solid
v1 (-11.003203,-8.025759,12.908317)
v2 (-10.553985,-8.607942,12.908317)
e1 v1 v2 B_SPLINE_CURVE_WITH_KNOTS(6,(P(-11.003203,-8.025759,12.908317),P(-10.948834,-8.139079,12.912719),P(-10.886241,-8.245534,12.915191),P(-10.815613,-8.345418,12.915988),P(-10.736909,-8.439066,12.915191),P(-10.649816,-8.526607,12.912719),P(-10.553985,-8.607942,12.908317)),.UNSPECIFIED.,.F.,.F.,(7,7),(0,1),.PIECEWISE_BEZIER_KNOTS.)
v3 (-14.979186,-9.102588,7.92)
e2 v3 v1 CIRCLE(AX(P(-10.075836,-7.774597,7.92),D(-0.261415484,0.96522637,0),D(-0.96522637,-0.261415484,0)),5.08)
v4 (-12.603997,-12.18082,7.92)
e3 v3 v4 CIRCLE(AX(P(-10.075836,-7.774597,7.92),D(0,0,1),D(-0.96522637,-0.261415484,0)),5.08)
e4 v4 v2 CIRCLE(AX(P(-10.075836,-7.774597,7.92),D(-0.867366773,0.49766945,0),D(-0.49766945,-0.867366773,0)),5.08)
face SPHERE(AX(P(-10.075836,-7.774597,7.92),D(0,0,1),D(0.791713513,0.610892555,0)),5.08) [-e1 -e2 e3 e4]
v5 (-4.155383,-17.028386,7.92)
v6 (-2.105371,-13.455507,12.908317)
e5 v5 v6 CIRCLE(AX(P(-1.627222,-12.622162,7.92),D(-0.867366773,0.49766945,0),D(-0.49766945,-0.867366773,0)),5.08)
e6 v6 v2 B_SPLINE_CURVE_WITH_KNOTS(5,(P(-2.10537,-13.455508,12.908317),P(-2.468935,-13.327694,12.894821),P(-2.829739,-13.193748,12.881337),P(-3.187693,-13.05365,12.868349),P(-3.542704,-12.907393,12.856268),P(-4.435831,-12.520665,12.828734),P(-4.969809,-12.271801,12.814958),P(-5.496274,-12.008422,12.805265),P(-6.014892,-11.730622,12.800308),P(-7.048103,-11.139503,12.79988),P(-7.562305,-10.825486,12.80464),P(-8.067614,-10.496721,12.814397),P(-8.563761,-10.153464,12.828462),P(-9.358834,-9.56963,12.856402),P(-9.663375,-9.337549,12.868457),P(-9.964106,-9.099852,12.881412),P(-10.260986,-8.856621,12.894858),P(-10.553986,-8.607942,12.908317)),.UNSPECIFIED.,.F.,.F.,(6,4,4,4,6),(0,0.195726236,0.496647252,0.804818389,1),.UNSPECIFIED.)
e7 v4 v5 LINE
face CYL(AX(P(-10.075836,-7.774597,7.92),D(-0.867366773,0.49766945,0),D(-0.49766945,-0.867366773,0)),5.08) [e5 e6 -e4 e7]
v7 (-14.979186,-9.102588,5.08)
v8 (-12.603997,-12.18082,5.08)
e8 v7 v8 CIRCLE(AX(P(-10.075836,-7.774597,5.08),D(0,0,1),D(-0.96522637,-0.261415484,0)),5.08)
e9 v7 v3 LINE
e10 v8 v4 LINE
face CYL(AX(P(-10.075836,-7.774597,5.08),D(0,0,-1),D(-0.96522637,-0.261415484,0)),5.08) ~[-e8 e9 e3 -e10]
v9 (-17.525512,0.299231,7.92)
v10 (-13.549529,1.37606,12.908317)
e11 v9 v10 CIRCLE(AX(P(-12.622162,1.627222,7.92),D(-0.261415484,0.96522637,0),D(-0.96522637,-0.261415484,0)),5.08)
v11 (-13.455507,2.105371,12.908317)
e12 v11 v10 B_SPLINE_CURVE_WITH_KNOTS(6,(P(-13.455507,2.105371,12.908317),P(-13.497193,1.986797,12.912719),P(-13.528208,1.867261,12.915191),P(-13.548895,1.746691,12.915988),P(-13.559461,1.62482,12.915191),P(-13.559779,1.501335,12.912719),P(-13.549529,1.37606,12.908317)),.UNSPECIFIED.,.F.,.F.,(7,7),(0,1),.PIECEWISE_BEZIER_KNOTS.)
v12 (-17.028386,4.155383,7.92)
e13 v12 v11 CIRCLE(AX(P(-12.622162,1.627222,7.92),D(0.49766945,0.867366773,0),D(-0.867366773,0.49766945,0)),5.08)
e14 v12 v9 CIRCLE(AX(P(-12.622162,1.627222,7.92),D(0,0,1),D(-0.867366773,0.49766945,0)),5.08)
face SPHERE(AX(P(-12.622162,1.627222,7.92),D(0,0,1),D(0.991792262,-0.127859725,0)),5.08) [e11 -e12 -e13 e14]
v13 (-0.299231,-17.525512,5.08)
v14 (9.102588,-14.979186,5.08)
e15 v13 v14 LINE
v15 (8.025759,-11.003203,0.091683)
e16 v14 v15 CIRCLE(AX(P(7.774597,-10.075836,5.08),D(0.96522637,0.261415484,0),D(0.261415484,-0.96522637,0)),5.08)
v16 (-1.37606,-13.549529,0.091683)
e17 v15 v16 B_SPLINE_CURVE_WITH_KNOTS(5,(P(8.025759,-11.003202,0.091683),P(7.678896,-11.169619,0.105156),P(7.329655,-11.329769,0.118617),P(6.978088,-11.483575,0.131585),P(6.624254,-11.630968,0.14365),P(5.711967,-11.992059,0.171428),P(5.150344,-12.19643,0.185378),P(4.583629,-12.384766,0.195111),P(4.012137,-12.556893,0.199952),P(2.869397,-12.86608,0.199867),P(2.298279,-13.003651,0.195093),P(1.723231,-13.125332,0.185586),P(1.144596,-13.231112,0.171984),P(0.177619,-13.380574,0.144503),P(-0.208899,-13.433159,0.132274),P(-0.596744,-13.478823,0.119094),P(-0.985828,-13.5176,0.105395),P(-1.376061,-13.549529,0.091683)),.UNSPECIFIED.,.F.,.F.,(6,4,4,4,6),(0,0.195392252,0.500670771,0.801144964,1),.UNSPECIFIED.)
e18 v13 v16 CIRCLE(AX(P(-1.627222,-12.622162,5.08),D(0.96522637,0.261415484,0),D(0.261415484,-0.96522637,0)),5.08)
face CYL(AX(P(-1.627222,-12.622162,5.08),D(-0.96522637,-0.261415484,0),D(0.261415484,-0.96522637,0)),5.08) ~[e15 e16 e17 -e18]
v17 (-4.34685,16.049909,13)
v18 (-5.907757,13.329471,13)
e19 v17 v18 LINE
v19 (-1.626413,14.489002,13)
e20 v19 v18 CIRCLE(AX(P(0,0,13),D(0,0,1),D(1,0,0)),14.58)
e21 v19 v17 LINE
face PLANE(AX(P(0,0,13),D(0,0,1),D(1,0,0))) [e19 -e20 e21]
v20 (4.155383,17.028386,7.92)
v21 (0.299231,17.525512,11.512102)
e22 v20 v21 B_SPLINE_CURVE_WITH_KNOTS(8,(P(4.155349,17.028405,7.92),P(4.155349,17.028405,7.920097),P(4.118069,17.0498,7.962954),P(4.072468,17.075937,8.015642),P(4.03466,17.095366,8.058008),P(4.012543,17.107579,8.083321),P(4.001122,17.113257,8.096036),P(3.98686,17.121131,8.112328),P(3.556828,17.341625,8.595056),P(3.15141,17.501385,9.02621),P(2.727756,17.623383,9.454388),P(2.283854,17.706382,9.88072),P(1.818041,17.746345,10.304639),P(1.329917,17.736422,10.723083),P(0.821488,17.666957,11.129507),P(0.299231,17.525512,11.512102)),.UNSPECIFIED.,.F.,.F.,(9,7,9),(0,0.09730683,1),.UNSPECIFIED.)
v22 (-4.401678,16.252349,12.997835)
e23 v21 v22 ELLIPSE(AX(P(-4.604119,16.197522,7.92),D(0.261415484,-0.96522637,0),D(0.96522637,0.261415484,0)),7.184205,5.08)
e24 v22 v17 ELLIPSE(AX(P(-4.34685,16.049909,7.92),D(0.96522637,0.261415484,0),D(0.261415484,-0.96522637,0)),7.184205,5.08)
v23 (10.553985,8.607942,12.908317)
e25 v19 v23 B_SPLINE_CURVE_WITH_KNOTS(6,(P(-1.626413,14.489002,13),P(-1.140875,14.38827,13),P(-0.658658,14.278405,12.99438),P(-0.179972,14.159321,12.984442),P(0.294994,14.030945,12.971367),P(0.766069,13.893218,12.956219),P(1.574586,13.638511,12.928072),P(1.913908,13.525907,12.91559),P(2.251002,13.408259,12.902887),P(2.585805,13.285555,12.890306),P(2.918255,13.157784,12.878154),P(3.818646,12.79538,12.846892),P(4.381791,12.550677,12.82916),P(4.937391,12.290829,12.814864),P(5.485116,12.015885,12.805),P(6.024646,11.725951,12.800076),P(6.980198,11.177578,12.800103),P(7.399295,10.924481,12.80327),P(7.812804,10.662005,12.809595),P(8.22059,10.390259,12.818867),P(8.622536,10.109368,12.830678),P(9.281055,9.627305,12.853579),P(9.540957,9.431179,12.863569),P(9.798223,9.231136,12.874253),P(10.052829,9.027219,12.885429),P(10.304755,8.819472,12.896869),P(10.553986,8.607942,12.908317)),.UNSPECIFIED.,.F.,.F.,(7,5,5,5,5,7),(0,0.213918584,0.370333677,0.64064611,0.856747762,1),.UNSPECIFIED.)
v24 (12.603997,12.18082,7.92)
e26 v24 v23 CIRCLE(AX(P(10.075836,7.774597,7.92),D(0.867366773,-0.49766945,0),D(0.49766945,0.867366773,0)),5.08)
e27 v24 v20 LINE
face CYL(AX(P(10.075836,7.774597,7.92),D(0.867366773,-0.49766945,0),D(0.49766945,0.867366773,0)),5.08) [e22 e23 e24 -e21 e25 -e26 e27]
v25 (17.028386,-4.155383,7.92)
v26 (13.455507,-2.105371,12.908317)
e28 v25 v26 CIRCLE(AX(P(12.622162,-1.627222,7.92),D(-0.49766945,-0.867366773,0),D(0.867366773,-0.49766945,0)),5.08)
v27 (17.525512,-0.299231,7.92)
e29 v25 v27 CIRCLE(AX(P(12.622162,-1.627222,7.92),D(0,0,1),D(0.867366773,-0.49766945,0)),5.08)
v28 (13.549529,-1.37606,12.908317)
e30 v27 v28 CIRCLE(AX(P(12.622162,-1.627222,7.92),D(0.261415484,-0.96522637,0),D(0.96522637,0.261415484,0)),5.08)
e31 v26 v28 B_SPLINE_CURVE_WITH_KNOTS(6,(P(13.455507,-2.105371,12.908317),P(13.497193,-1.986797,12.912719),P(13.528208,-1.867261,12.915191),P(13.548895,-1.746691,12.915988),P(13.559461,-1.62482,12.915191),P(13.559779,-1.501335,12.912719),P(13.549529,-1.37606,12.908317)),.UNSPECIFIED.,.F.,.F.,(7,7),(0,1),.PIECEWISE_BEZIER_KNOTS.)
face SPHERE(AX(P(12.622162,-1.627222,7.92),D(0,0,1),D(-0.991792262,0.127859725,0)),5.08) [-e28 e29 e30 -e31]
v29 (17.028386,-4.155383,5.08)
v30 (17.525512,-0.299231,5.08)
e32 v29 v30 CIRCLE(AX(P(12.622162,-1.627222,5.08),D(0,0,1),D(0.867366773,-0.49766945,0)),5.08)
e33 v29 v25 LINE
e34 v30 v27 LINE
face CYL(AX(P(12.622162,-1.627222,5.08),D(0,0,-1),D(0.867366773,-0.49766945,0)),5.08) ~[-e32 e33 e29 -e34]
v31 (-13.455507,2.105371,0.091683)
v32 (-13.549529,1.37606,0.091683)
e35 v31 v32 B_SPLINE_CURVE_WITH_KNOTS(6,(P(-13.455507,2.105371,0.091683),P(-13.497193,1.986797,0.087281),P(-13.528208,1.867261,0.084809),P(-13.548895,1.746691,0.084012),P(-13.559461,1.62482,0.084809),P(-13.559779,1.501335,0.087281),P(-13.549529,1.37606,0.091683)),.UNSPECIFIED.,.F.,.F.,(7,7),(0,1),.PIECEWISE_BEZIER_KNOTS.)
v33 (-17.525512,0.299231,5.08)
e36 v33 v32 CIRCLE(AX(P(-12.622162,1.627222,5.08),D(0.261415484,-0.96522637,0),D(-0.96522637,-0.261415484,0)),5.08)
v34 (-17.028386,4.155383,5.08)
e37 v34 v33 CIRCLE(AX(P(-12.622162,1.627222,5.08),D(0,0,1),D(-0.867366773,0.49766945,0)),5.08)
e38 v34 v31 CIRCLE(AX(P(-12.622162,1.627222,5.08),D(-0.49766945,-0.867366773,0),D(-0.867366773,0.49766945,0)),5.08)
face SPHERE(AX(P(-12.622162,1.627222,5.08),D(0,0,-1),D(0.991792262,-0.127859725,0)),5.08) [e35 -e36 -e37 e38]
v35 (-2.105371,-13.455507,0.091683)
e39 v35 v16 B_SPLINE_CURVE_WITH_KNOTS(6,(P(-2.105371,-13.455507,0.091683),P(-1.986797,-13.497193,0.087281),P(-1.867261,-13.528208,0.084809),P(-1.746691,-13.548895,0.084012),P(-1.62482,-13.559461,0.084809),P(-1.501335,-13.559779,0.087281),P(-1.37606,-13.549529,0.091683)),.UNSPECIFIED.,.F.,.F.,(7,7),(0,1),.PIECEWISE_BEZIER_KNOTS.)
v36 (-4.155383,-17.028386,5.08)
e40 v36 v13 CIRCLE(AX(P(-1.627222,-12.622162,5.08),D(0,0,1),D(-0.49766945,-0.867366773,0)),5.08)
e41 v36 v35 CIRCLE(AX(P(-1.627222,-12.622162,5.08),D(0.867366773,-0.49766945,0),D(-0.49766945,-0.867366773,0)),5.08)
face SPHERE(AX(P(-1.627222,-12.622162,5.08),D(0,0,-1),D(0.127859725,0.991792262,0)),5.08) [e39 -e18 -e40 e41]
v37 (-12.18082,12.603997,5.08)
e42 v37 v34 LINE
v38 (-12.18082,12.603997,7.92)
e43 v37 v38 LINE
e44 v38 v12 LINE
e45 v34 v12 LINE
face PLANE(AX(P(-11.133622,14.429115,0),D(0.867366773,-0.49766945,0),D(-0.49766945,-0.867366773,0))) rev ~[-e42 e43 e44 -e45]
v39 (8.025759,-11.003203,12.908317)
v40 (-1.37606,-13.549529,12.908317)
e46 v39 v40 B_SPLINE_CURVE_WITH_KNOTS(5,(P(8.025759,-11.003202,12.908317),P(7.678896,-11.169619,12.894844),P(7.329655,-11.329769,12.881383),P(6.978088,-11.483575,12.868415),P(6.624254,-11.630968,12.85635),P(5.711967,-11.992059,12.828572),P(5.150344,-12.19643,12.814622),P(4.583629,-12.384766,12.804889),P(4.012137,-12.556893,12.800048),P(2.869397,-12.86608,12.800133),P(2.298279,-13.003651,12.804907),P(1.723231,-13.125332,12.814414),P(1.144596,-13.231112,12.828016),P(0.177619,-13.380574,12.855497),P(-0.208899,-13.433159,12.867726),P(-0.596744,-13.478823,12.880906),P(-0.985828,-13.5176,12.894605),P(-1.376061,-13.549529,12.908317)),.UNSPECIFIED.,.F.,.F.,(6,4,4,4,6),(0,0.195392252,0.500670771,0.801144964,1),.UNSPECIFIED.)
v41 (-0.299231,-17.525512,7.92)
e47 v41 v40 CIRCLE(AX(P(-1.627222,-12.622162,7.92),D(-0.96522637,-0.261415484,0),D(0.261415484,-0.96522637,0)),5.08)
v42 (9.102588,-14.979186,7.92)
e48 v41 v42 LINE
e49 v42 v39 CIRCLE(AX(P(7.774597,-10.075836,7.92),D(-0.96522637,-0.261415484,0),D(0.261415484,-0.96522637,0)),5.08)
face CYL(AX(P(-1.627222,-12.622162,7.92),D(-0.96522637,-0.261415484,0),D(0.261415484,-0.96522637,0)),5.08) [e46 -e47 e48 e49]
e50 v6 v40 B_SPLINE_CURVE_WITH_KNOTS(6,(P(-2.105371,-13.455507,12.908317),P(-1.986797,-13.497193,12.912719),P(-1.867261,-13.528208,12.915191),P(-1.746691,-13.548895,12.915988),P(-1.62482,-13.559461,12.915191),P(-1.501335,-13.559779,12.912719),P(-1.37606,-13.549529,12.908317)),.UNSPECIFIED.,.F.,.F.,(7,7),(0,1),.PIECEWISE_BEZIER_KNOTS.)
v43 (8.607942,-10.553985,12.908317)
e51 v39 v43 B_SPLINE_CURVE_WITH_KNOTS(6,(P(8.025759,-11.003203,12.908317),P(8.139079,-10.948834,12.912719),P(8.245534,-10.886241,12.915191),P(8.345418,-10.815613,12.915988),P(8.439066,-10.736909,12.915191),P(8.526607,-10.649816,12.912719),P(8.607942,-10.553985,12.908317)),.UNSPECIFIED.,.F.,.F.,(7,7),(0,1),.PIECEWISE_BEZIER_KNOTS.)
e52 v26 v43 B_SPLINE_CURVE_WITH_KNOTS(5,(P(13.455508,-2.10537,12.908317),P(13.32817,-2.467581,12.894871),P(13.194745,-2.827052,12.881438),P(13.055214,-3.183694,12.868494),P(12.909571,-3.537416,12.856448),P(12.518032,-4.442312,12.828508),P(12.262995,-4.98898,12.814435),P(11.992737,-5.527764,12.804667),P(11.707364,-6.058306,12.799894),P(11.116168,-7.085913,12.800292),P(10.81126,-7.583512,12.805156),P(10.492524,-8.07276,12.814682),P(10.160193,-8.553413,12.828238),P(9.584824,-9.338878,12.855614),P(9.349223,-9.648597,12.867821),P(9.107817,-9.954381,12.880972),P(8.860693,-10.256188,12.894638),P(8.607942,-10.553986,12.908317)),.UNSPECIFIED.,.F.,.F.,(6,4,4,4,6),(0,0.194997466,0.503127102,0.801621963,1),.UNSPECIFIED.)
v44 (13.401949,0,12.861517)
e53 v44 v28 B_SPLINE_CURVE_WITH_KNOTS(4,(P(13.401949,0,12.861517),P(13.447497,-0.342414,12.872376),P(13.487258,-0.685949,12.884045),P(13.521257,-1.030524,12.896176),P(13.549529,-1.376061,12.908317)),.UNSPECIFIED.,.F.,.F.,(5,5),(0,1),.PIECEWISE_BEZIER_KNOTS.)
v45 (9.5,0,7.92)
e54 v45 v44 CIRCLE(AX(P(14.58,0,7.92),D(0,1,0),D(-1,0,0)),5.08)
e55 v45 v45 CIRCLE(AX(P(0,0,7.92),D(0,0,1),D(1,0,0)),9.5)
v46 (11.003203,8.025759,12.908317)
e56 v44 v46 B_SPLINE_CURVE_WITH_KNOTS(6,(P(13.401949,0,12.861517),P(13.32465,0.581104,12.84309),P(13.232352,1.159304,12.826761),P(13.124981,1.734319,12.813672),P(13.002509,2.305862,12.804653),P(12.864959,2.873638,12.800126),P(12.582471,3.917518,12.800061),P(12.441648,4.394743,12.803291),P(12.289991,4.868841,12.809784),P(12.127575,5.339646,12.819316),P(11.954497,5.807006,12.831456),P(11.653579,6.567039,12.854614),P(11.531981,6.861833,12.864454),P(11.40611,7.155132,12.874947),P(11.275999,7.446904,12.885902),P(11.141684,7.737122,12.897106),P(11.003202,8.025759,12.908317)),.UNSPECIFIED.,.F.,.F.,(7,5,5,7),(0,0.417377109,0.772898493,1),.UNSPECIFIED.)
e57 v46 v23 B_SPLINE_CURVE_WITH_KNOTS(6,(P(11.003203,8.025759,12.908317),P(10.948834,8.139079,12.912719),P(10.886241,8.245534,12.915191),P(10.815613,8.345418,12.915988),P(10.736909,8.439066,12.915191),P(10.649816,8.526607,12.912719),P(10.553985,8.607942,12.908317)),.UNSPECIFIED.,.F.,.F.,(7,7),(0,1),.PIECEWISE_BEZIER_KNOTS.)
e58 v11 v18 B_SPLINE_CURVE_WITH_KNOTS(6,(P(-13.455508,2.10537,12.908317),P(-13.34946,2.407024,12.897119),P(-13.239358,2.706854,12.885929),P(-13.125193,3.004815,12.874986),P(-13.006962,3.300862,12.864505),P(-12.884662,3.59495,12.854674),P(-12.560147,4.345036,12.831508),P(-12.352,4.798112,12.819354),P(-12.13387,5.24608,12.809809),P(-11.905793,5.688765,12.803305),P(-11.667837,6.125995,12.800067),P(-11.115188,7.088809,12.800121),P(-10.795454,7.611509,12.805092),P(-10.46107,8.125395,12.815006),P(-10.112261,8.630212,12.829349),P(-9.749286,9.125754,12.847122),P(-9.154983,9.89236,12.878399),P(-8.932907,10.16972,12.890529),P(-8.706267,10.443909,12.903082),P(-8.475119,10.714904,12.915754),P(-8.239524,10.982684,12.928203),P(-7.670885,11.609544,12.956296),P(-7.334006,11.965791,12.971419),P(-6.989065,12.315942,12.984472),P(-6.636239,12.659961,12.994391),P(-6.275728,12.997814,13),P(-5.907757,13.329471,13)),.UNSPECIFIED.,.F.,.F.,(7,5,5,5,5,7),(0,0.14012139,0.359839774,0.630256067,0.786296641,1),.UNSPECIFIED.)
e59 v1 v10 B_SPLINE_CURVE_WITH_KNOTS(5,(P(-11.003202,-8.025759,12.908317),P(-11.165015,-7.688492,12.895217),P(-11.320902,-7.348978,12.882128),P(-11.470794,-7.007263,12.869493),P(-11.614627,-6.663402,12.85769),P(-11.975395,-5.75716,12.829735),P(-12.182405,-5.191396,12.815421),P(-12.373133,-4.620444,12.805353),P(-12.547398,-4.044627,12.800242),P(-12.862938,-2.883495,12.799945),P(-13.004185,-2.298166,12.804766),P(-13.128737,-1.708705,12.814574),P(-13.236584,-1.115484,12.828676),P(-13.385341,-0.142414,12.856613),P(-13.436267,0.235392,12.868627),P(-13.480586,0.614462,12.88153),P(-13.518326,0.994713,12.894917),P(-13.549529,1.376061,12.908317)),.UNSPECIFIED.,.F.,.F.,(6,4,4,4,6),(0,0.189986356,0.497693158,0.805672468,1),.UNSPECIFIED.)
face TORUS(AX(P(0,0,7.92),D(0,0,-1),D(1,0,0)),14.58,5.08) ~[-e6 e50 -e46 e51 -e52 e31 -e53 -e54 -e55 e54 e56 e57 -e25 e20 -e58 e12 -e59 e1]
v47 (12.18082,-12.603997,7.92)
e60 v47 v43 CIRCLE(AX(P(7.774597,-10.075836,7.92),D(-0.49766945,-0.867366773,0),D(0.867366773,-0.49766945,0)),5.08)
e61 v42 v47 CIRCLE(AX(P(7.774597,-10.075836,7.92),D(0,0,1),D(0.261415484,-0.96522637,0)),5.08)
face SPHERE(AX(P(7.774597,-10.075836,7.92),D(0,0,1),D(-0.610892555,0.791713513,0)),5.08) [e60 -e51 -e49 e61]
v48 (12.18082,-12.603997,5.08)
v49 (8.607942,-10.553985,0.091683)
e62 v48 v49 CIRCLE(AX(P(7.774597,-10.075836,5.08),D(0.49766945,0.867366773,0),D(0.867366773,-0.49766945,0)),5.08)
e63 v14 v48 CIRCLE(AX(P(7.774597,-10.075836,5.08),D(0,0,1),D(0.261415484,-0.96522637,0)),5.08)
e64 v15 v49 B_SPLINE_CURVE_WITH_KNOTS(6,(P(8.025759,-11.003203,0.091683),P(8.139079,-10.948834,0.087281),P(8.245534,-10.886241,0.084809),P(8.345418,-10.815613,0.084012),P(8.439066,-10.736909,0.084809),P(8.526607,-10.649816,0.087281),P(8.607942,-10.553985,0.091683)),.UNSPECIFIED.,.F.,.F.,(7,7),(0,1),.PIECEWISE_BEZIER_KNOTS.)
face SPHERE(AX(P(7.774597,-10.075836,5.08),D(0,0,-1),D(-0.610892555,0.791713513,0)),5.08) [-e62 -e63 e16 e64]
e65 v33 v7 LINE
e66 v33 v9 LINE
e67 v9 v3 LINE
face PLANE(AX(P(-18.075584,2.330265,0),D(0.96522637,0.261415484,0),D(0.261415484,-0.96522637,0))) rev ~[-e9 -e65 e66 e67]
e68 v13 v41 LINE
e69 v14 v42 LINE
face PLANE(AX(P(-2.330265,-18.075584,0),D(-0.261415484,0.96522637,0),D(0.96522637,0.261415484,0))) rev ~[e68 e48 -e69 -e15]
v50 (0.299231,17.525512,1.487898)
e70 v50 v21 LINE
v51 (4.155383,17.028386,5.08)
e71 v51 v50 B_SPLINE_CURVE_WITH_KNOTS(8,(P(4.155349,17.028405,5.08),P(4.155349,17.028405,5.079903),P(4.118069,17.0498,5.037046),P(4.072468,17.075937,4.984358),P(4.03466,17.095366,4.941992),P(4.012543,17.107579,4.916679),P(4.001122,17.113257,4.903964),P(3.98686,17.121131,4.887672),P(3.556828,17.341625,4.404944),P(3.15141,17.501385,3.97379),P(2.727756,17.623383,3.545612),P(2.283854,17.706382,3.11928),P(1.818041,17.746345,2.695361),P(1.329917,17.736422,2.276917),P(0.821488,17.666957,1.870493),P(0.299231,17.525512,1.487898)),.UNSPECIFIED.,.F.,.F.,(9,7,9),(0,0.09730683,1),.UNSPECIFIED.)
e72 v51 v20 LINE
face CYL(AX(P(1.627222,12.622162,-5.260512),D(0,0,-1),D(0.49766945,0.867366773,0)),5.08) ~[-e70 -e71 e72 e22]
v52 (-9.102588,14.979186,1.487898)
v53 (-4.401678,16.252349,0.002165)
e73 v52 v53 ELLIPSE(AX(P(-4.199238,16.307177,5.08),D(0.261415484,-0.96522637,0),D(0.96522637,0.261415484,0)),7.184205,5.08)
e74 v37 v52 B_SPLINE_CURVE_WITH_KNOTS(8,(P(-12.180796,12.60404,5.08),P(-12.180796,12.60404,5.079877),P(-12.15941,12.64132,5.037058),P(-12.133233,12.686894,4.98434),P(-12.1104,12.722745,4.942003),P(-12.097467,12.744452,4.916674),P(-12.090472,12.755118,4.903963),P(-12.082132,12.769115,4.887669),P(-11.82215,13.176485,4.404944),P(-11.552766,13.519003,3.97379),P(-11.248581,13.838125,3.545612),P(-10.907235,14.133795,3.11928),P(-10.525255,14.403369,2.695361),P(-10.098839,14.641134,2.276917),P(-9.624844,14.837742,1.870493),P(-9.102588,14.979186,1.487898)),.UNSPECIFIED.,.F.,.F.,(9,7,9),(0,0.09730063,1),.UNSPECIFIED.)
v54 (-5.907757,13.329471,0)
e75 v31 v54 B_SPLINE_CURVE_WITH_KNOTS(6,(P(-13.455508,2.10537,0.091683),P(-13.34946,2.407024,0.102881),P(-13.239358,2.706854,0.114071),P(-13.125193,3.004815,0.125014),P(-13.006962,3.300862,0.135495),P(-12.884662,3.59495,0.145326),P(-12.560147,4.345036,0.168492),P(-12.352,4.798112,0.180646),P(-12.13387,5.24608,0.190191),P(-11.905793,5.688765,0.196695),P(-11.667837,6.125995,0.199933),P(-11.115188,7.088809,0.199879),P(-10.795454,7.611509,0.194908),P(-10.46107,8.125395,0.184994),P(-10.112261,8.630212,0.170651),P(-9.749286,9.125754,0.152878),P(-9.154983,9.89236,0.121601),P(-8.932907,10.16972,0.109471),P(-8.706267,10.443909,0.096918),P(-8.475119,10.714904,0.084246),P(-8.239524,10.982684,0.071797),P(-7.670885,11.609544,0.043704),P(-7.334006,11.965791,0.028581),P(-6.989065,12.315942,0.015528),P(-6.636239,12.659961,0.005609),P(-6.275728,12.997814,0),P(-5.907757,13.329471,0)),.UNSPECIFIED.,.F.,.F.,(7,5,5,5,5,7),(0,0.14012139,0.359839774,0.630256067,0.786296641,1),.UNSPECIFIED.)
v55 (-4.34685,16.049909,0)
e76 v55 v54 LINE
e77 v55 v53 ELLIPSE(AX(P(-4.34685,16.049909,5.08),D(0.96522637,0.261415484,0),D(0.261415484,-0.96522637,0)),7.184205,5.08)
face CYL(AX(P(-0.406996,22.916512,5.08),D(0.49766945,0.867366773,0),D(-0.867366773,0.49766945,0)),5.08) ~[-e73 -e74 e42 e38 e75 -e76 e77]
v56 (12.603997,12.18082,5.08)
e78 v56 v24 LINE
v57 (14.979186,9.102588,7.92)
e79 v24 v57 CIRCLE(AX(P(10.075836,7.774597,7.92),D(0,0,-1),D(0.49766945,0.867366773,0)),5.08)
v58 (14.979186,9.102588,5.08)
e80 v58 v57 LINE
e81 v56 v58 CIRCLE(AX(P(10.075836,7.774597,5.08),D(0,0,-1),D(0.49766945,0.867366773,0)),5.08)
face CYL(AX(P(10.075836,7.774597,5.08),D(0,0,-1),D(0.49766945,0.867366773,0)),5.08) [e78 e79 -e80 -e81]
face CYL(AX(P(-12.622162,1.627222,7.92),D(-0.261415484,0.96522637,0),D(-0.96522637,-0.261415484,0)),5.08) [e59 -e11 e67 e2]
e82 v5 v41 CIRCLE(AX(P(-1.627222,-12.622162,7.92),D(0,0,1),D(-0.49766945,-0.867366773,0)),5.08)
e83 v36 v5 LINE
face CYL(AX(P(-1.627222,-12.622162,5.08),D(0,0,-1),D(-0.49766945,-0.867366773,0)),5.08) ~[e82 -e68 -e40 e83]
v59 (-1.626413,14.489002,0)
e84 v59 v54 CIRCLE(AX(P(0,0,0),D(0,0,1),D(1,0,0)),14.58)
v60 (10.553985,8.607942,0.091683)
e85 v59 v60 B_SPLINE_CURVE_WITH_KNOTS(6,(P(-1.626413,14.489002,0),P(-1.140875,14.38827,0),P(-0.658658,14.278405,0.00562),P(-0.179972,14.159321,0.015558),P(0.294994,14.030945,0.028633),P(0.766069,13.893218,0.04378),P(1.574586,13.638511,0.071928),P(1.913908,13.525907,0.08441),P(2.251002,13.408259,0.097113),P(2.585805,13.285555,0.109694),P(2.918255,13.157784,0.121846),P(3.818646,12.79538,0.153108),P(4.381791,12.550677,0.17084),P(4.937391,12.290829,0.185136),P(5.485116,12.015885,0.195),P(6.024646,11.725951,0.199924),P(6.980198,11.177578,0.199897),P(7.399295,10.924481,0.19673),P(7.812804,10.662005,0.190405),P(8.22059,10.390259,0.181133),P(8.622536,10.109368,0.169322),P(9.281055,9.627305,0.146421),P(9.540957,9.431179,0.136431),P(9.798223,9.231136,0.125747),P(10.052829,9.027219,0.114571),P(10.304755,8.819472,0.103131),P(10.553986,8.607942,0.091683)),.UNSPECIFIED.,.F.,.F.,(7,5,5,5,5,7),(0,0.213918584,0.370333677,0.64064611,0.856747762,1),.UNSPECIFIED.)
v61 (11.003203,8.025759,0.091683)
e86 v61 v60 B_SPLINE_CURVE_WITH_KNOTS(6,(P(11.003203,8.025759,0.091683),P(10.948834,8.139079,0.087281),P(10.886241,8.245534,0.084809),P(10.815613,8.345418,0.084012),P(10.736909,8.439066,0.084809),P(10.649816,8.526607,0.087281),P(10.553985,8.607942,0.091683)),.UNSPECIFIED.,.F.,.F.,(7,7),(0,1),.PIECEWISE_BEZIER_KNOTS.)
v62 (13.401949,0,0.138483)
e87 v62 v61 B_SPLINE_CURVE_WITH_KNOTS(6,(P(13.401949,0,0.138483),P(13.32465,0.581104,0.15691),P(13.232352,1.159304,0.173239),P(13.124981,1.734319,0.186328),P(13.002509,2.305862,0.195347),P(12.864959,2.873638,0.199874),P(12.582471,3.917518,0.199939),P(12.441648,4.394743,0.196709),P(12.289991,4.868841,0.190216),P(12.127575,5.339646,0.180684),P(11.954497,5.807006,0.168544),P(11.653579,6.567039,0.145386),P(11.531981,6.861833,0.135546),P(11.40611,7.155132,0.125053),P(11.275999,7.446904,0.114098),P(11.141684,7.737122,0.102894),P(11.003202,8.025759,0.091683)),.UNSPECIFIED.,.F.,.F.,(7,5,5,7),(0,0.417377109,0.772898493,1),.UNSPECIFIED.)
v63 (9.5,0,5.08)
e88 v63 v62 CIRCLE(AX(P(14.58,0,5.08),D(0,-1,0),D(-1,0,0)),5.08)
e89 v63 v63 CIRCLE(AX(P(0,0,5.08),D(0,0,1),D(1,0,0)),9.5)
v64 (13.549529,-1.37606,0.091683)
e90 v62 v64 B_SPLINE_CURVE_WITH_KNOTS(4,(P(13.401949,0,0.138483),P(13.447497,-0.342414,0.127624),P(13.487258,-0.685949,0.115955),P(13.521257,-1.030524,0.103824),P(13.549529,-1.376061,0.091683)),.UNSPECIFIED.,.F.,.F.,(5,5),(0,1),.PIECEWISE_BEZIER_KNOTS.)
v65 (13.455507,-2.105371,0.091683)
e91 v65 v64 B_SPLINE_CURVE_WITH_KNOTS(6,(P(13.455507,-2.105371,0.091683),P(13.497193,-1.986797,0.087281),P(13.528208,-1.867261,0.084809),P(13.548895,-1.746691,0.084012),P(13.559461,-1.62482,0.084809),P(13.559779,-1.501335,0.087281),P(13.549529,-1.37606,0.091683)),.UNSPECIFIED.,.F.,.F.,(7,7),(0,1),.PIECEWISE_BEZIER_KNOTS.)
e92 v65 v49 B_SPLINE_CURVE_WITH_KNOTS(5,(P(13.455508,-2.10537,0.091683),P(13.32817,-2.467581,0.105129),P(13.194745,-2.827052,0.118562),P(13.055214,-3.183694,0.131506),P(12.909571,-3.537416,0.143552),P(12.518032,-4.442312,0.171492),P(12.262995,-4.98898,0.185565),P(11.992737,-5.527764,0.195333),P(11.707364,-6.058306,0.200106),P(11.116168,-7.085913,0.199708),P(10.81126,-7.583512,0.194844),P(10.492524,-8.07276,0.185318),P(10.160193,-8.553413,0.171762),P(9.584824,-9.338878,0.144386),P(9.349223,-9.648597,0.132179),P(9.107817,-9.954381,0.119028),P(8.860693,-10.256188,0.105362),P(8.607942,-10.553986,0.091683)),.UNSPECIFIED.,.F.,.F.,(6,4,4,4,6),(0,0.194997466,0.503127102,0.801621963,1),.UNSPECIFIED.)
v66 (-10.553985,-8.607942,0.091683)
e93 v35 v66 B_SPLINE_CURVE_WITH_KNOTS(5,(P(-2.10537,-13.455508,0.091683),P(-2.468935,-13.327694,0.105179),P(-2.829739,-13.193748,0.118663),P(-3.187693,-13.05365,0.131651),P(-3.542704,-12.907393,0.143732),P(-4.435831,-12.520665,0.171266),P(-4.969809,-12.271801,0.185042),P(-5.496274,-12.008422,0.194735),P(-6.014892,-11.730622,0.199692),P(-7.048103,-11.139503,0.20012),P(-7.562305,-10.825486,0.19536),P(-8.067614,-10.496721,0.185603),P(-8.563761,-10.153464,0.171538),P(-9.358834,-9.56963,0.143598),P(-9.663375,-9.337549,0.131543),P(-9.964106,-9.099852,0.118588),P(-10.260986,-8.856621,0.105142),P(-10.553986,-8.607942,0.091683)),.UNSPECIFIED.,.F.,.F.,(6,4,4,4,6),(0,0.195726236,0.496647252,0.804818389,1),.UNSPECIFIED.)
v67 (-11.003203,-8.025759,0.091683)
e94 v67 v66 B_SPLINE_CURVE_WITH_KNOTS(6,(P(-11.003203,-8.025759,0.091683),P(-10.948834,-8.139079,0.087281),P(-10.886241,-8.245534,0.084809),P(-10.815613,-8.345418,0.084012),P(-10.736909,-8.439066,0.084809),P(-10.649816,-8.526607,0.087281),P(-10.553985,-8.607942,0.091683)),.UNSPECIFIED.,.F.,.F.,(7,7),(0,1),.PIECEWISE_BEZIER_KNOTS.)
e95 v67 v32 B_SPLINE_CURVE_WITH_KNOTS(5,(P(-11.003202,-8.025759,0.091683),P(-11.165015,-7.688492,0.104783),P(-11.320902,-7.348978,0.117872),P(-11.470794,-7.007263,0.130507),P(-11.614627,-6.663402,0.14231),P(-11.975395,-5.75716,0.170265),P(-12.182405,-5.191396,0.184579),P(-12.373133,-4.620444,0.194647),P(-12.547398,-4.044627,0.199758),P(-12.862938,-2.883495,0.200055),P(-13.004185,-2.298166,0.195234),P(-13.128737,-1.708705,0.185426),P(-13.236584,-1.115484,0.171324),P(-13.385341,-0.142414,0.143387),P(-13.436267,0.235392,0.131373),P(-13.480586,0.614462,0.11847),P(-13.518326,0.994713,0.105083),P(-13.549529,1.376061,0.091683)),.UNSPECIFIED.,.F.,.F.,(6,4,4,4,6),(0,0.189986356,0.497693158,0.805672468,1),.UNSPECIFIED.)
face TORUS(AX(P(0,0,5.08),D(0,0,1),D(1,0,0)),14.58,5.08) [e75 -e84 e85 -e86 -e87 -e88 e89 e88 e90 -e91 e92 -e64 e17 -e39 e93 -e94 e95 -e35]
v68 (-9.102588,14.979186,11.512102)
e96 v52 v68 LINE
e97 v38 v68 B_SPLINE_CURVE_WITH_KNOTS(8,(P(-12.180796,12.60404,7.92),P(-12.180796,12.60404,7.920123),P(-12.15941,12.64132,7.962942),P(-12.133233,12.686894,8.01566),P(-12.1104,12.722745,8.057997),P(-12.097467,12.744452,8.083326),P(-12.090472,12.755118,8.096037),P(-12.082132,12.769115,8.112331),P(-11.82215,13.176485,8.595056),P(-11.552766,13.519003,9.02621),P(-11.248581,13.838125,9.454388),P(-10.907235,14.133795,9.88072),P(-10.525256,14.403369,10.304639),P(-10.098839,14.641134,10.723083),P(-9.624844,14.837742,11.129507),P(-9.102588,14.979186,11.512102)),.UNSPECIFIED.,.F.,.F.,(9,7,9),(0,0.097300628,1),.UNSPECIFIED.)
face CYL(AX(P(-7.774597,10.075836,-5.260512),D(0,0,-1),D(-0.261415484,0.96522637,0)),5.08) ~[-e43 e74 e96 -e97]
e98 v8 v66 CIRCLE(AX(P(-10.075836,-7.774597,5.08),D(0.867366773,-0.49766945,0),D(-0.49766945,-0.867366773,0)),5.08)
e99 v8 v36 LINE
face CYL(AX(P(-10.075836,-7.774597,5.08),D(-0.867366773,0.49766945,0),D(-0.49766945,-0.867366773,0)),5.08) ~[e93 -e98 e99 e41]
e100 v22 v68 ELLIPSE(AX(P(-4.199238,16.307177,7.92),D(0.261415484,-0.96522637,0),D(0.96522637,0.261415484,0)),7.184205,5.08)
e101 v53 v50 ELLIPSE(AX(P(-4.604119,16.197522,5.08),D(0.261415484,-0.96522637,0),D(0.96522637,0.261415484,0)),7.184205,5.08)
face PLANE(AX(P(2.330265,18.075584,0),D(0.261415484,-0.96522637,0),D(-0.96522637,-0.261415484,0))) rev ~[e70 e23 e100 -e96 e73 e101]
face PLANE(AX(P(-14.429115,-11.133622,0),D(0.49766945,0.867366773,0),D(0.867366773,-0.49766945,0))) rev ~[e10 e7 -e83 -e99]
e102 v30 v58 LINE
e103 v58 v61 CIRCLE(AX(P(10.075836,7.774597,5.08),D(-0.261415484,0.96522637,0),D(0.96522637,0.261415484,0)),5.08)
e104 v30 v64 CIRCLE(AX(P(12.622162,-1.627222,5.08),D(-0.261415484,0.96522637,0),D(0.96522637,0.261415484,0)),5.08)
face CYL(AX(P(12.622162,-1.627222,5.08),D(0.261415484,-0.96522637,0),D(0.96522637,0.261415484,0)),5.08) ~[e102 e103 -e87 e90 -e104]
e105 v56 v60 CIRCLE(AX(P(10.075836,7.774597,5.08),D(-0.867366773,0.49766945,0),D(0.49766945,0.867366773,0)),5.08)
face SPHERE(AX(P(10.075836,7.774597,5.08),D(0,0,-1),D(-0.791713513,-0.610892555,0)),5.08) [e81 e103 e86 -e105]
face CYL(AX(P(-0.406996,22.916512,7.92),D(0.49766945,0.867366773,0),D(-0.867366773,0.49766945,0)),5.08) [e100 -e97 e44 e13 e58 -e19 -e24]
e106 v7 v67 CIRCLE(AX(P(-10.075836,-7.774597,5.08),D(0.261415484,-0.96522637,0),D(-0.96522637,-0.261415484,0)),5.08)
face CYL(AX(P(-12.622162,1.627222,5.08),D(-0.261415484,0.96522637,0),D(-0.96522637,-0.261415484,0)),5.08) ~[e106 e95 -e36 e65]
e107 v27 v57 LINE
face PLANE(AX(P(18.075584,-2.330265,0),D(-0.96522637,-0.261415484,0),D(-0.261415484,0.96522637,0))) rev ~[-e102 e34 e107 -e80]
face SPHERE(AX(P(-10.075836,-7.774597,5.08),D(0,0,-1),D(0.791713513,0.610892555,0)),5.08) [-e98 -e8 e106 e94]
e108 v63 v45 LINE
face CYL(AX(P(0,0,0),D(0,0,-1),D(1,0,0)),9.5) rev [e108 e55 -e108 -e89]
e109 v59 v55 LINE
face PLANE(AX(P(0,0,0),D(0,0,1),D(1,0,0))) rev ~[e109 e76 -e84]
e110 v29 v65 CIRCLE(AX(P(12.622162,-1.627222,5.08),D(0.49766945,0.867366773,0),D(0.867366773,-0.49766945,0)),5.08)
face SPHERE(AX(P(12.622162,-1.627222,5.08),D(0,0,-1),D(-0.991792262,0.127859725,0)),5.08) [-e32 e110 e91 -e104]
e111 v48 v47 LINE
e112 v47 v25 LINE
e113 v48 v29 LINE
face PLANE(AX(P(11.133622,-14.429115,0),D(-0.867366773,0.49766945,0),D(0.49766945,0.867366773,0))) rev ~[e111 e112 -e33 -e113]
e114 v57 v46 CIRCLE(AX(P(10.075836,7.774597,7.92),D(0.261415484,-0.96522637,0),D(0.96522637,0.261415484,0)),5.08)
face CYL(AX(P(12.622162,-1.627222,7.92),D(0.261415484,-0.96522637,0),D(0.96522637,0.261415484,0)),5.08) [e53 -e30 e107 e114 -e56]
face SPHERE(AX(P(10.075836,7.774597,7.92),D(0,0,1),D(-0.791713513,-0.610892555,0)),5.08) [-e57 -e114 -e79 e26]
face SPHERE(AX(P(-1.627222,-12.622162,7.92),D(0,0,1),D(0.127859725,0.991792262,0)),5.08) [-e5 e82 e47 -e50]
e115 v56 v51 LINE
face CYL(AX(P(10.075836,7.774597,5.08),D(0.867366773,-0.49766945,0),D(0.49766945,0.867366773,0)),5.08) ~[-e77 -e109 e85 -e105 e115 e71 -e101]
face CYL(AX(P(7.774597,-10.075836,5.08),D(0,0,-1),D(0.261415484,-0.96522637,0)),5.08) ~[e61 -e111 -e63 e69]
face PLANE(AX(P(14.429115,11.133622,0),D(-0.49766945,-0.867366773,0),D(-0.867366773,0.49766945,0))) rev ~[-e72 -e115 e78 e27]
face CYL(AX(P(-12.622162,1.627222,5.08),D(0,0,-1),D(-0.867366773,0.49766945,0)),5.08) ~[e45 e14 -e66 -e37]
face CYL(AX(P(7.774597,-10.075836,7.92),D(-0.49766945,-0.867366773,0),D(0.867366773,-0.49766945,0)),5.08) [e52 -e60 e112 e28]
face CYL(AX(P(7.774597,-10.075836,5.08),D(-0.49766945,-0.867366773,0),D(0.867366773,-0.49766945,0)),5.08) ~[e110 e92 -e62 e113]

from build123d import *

# Parameters (mm, degrees)
F0_R         = 9.5
F1_DEPTH     = 13
F2_T1_DEPTH  = 2.84
F2_T3_DEPTH  = 23.5210244843
F2_T5_DEPTH  = 24.5447375548
F2_T7_DEPTH  = 9.740532658
F2_T9_DEPTH  = 9.740532658
F2_T11_DEPTH = 9.740532658
F2_T13_DEPTH = 9.740532658
F2_T15_DEPTH = 9.740532658
F2_T17_DEPTH = 24.5447375548
F2_T22_DEPTH = 5.08
F2_T28_DEPTH = 5.08
F2_T34_DEPTH = 5.08
F2_T40_DEPTH = 5.08
F2_T46_DEPTH = 5.08
F2_T52_DEPTH = 5.08
F2_T58_DEPTH = 5.08
F2_T64_DEPTH = 5.08
F2_T70_DEPTH = 5.08
F2_T76_DEPTH = 5.08
F2_T82_DEPTH = 5.08
F2_T88_DEPTH = 5.08


# Not quite as in the source:
# - a fillet or chamfer that OpenCascade refuses, or shapes differently, is made with other operations: its cross-section is extruded or revolved along the edge and cut away or added


with BuildPart() as f1:
    # F0 (on Top) → F1 (new body)
    with BuildSketch(Plane.XY):
        Polygon((-11.1336216505, 14.4291146309), (-18.0755841703, 2.3302654338), (-14.4291146309, -11.1336216505), (-2.3302654338, -18.0755841703), (11.1336216505, -14.4291146309), (18.0755841703, -2.3302654338), (14.4291146309, 11.1336216505), (2.3302654338, 18.0755841703), align=None)
        Circle(F0_R, mode=Mode.SUBTRACT)
    extrude(amount=F1_DEPTH)

    # F2: fillet of radius 5.08 on 24 edges, made by hand

    # F2_s2 → F2_t1 (cut)
    with BuildSketch(Plane.XY.offset(5.08)):
        with BuildLine():
            ThreePointArc((12.6039972204, 12.1808201445), (14.0977410579, 10.8779311192), (14.979186372, 9.1025875968))
            Line((14.979186372, 9.1025875968), (14.4291146309, 11.1336216505))
            Line((14.4291146309, 11.1336216505), (12.6039972204, 12.1808201445))
        make_face()
        with BuildLine():
            ThreePointArc((17.0283856763, -4.1553828443), (17.6604671611, -2.2767494418), (17.5255124292, -0.29923138))
            Line((17.5255124292, -0.29923138), (18.0755841703, -2.3302654338))
            Line((18.0755841703, -2.3302654338), (17.0283856763, -4.1553828443))
        make_face()
        with BuildLine():
            ThreePointArc((9.1025875968, -14.979186372), (10.8779311192, -14.0977410579), (12.1808201445, -12.6039972204))
            Line((12.1808201445, -12.6039972204), (11.1336216505, -14.4291146309))
            Line((11.1336216505, -14.4291146309), (9.1025875968, -14.979186372))
        make_face()
        with BuildLine():
            ThreePointArc((-4.1553828443, -17.0283856763), (-2.2767494418, -17.6604671611), (-0.29923138, -17.5255124292))
            Line((-0.29923138, -17.5255124292), (-2.3302654338, -18.0755841703))
            Line((-2.3302654338, -18.0755841703), (-4.1553828443, -17.0283856763))
        make_face()
        with BuildLine():
            ThreePointArc((-14.979186372, -9.1025875968), (-14.0977410579, -10.8779311192), (-12.6039972204, -12.1808201445))
            Line((-12.6039972204, -12.1808201445), (-14.4291146309, -11.1336216505))
            Line((-14.4291146309, -11.1336216505), (-14.979186372, -9.1025875968))
        make_face()
        with BuildLine():
            ThreePointArc((-17.0283856763, 4.1553828443), (-17.6604671611, 2.2767494418), (-17.5255124292, 0.29923138))
            Line((-17.5255124292, 0.29923138), (-18.0755841703, 2.3302654338))
            Line((-18.0755841703, 2.3302654338), (-17.0283856763, 4.1553828443))
        make_face()
    extrude(amount=F2_T1_DEPTH, mode=Mode.SUBTRACT)

    # F2_s4 → F2_t3 (cut)
    with BuildSketch(Plane.XY.offset(-5.2605122421)):
        with BuildLine():
            ThreePointArc((4.1553828443, 17.0283856763), (2.2767494418, 17.6604671611), (0.29923138, 17.5255124292))
            Line((0.29923138, 17.5255124292), (2.3302654338, 18.0755841703))
            Line((2.3302654338, 18.0755841703), (4.1553828443, 17.0283856763))
        make_face()
        with BuildLine():
            ThreePointArc((-9.1025875968, 14.979186372), (-10.8779311192, 14.0977410579), (-12.1808201445, 12.6039972204))
            Line((-12.1808201445, 12.6039972204), (-11.1336216505, 14.4291146309))
            Line((-11.1336216505, 14.4291146309), (-9.1025875968, 14.979186372))
        make_face()
    extrude(amount=F2_T3_DEPTH, mode=Mode.SUBTRACT)

    # F2_s6 → F2_t5 (cut)
    with BuildSketch(Plane(origin=(4.224307188, -2.4237827659, 0), x_dir=(0, 0, 1), z_dir=(-0.8673667727, 0.4976694501, 0))):
        with BuildLine():
            ThreePointArc((5.08, 16.8378630238), (1.4878975516, 15.3499654722), (0, 11.7578630238))
            Line((0, 11.7578630238), (0, 16.8378630238))
            Line((0, 16.8378630238), (5.08, 16.8378630238))
        make_face()
        with BuildLine():
            ThreePointArc((7.92, 16.8378630238), (11.5121024484, 15.3499654722), (13, 11.7578630238))
            Line((13, 11.7578630238), (13, 16.8378630238))
            Line((13, 16.8378630238), (7.92, 16.8378630238))
        make_face()
    extrude(amount=F2_T5_DEPTH, mode=Mode.SUBTRACT)

    # F2_s8 → F2_t7 (cut)
    with BuildSketch(Plane(origin=(1.2731630286, -4.7009094884, 0), x_dir=(0, 0, 1), z_dir=(-0.2614154838, 0.9652263697, 0))):
        with BuildLine():
            ThreePointArc((5.08, 16.8378630238), (1.4878975516, 15.3499654722), (0, 11.7578630238))
            Line((0, 11.7578630238), (0, 16.8378630238))
            Line((0, 16.8378630238), (5.08, 16.8378630238))
        make_face()
        with BuildLine():
            ThreePointArc((7.92, 16.8378630238), (11.5121024484, 15.3499654722), (13, 11.7578630238))
            Line((13, 11.7578630238), (13, 16.8378630238))
            Line((13, 16.8378630238), (7.92, 16.8378630238))
        make_face()
    extrude(amount=F2_T7_DEPTH, mode=Mode.SUBTRACT)

    # F2_s10 → F2_t9 (cut)
    with BuildSketch(Plane(origin=(-2.4237827659, -4.224307188, 0), x_dir=(0, 0, 1), z_dir=(0.4976694501, 0.8673667727, 0))):
        with BuildLine():
            ThreePointArc((5.08, 16.8378630238), (1.4878975516, 15.3499654722), (0, 11.7578630238))
            Line((0, 11.7578630238), (0, 16.8378630238))
            Line((0, 16.8378630238), (5.08, 16.8378630238))
        make_face()
        with BuildLine():
            ThreePointArc((7.92, 16.8378630238), (11.5121024484, 15.3499654722), (13, 11.7578630238))
            Line((13, 11.7578630238), (13, 16.8378630238))
            Line((13, 16.8378630238), (7.92, 16.8378630238))
        make_face()
    extrude(amount=F2_T9_DEPTH, mode=Mode.SUBTRACT)

    # F2_s12 → F2_t11 (cut)
    with BuildSketch(Plane(origin=(-4.7009094884, -1.2731630286, 0), x_dir=(0, 0, 1), z_dir=(0.9652263697, 0.2614154838, 0))):
        with BuildLine():
            ThreePointArc((5.08, 16.8378630238), (1.4878975516, 15.3499654722), (0, 11.7578630238))
            Line((0, 11.7578630238), (0, 16.8378630238))
            Line((0, 16.8378630238), (5.08, 16.8378630238))
        make_face()
        with BuildLine():
            ThreePointArc((7.92, 16.8378630238), (11.5121024484, 15.3499654722), (13, 11.7578630238))
            Line((13, 11.7578630238), (13, 16.8378630238))
            Line((13, 16.8378630238), (7.92, 16.8378630238))
        make_face()
    extrude(amount=F2_T11_DEPTH, mode=Mode.SUBTRACT)

    # F2_s14 → F2_t13 (cut)
    with BuildSketch(Plane(origin=(-4.224307188, 2.4237827659, 0), x_dir=(0, 0, 1), z_dir=(0.8673667727, -0.4976694501, 0))):
        with BuildLine():
            ThreePointArc((5.08, 16.8378630238), (1.4878975516, 15.3499654722), (0, 11.7578630238))
            Line((0, 11.7578630238), (0, 16.8378630238))
            Line((0, 16.8378630238), (5.08, 16.8378630238))
        make_face()
        with BuildLine():
            ThreePointArc((7.92, 16.8378630238), (11.5121024484, 15.3499654722), (13, 11.7578630238))
            Line((13, 11.7578630238), (13, 16.8378630238))
            Line((13, 16.8378630238), (7.92, 16.8378630238))
        make_face()
    extrude(amount=F2_T13_DEPTH, mode=Mode.SUBTRACT)

    # F2_s16 → F2_t15 (cut)
    with BuildSketch(Plane(origin=(-1.2731630286, 4.7009094884, 0), x_dir=(0, 0, 1), z_dir=(0.2614154838, -0.9652263697, 0))):
        with BuildLine():
            ThreePointArc((5.08, 16.8378630238), (1.4878975516, 15.3499654722), (0, 11.7578630238))
            Line((0, 11.7578630238), (0, 16.8378630238))
            Line((0, 16.8378630238), (5.08, 16.8378630238))
        make_face()
        with BuildLine():
            ThreePointArc((7.92, 16.8378630238), (11.5121024484, 15.3499654722), (13, 11.7578630238))
            Line((13, 11.7578630238), (13, 16.8378630238))
            Line((13, 16.8378630238), (7.92, 16.8378630238))
        make_face()
    extrude(amount=F2_T15_DEPTH, mode=Mode.SUBTRACT)

    # F2_s18 → F2_t17 (cut)
    with BuildSketch(Plane(origin=(9.7913832765, 17.0649826121, 0), x_dir=(0, 0, 1), z_dir=(-0.4976694501, -0.8673667727, 0))):
        with BuildLine():
            ThreePointArc((5.08, 16.8378630238), (1.4878975516, 15.3499654722), (0, 11.7578630238))
            Line((0, 11.7578630238), (0, 16.8378630238))
            Line((0, 16.8378630238), (5.08, 16.8378630238))
        make_face()
        with BuildLine():
            ThreePointArc((7.92, 16.8378630238), (11.5121024484, 15.3499654722), (13, 11.7578630238))
            Line((13, 11.7578630238), (13, 16.8378630238))
            Line((13, 16.8378630238), (7.92, 16.8378630238))
        make_face()
    extrude(amount=F2_T17_DEPTH, mode=Mode.SUBTRACT)


with BuildPart() as f2_tool20:
    # F2_s21 → F2_t22 (new body)
    with BuildSketch(Plane.XY.offset(5.08)):
        Polygon((10.0758364137, 7.7745969391), (14.979186372, 9.1025875968), (14.4291146309, 11.1336216505), (12.6039972204, 12.1808201445), align=None)
    extrude(amount=-F2_T22_DEPTH)

    # F2_s23 → F2_t24 (revolve, cut)
    with BuildSketch(Plane(origin=(10.0758364137, 7.7745969391, 5.08), x_dir=(-0.7917135126, -0.6108925551, 0), z_dir=(0.6108925551, -0.7917135126, 0))):
        with BuildLine():
            ThreePointArc((0, -5.08), (5.08, 0), (0, 5.08))
            Line((0, 5.08), (0, -5.08))
        make_face()
    revolve(axis=Axis((10.0758364137, 7.7745969391, 5.08), (0, 0, -1)), mode=Mode.SUBTRACT)


with BuildPart() as f1_1:
    add(f1.part)

    # F2_t19: cut F2_tool20
    add(f2_tool20.part, mode=Mode.SUBTRACT)


with BuildPart() as f2_tool26:
    # F2_s27 → F2_t28 (new body)
    with BuildSketch(Plane.XY.offset(7.92)):
        Polygon((10.0758364137, 7.7745969391), (14.979186372, 9.1025875968), (14.4291146309, 11.1336216505), (12.6039972204, 12.1808201445), align=None)
    extrude(amount=F2_T28_DEPTH)

    # F2_s29 → F2_t30 (revolve, cut)
    with BuildSketch(Plane(origin=(10.0758364137, 7.7745969391, 7.92), x_dir=(-0.7917135126, -0.6108925551, 0), z_dir=(-0.6108925551, 0.7917135126, 0))):
        with BuildLine():
            ThreePointArc((0, -5.08), (5.08, 0), (0, 5.08))
            Line((0, 5.08), (0, -5.08))
        make_face()
    revolve(axis=Axis((10.0758364137, 7.7745969391, 7.92), (0, 0, 1)), mode=Mode.SUBTRACT)


with BuildPart() as f1_2:
    add(f1_1.part)

    # F2_t25: cut F2_tool26
    add(f2_tool26.part, mode=Mode.SUBTRACT)


with BuildPart() as f2_tool32:
    # F2_s33 → F2_t34 (new body)
    with BuildSketch(Plane.XY.offset(5.08)):
        Polygon((12.6221624709, -1.6272220377), (17.0283856763, -4.1553828443), (18.0755841703, -2.3302654338), (17.5255124292, -0.29923138), align=None)
    extrude(amount=-F2_T34_DEPTH)

    # F2_s35 → F2_t36 (revolve, cut)
    with BuildSketch(Plane(origin=(12.6221624709, -1.6272220377, 5.08), x_dir=(-0.9917922619, 0.1278597252, 0), z_dir=(-0.1278597252, -0.9917922619, 0))):
        with BuildLine():
            ThreePointArc((0, -5.08), (5.08, 0), (0, 5.08))
            Line((0, 5.08), (0, -5.08))
        make_face()
    revolve(axis=Axis((12.6221624709, -1.6272220377, 5.08), (0, 0, -1)), mode=Mode.SUBTRACT)


with BuildPart() as f1_3:
    add(f1_2.part)

    # F2_t31: cut F2_tool32
    add(f2_tool32.part, mode=Mode.SUBTRACT)


with BuildPart() as f2_tool38:
    # F2_s39 → F2_t40 (new body)
    with BuildSketch(Plane.XY.offset(7.92)):
        Polygon((12.6221624709, -1.6272220377), (17.0283856763, -4.1553828443), (18.0755841703, -2.3302654338), (17.5255124292, -0.29923138), align=None)
    extrude(amount=F2_T40_DEPTH)

    # F2_s41 → F2_t42 (revolve, cut)
    with BuildSketch(Plane(origin=(12.6221624709, -1.6272220377, 7.92), x_dir=(-0.9917922619, 0.1278597252, 0), z_dir=(0.1278597252, 0.9917922619, 0))):
        with BuildLine():
            ThreePointArc((0, -5.08), (5.08, 0), (0, 5.08))
            Line((0, 5.08), (0, -5.08))
        make_face()
    revolve(axis=Axis((12.6221624709, -1.6272220377, 7.92), (0, 0, 1)), mode=Mode.SUBTRACT)


with BuildPart() as f1_4:
    add(f1_3.part)

    # F2_t37: cut F2_tool38
    add(f2_tool38.part, mode=Mode.SUBTRACT)


with BuildPart() as f2_tool44:
    # F2_s45 → F2_t46 (new body)
    with BuildSketch(Plane.XY.offset(5.08)):
        Polygon((7.7745969391, -10.0758364137), (9.1025875968, -14.979186372), (11.1336216505, -14.4291146309), (12.1808201445, -12.6039972204), align=None)
    extrude(amount=-F2_T46_DEPTH)

    # F2_s47 → F2_t48 (revolve, cut)
    with BuildSketch(Plane(origin=(7.7745969391, -10.0758364137, 5.08), x_dir=(-0.6108925551, 0.7917135126, 0), z_dir=(-0.7917135126, -0.6108925551, 0))):
        with BuildLine():
            ThreePointArc((0, -5.08), (5.08, 0), (0, 5.08))
            Line((0, 5.08), (0, -5.08))
        make_face()
    revolve(axis=Axis((7.7745969391, -10.0758364137, 5.08), (0, 0, -1)), mode=Mode.SUBTRACT)


with BuildPart() as f1_5:
    add(f1_4.part)

    # F2_t43: cut F2_tool44
    add(f2_tool44.part, mode=Mode.SUBTRACT)


with BuildPart() as f2_tool50:
    # F2_s51 → F2_t52 (new body)
    with BuildSketch(Plane.XY.offset(7.92)):
        Polygon((7.7745969391, -10.0758364137), (9.1025875968, -14.979186372), (11.1336216505, -14.4291146309), (12.1808201445, -12.6039972204), align=None)
    extrude(amount=F2_T52_DEPTH)

    # F2_s53 → F2_t54 (revolve, cut)
    with BuildSketch(Plane(origin=(7.7745969391, -10.0758364137, 7.92), x_dir=(-0.6108925551, 0.7917135126, 0), z_dir=(0.7917135126, 0.6108925551, 0))):
        with BuildLine():
            ThreePointArc((0, -5.08), (5.08, 0), (0, 5.08))
            Line((0, 5.08), (0, -5.08))
        make_face()
    revolve(axis=Axis((7.7745969391, -10.0758364137, 7.92), (0, 0, 1)), mode=Mode.SUBTRACT)


with BuildPart() as f1_6:
    add(f1_5.part)

    # F2_t49: cut F2_tool50
    add(f2_tool50.part, mode=Mode.SUBTRACT)


with BuildPart() as f2_tool56:
    # F2_s57 → F2_t58 (new body)
    with BuildSketch(Plane.XY.offset(5.08)):
        Polygon((-1.6272220377, -12.6221624709), (-4.1553828443, -17.0283856763), (-2.3302654338, -18.0755841703), (-0.29923138, -17.5255124292), align=None)
    extrude(amount=-F2_T58_DEPTH)

    # F2_s59 → F2_t60 (revolve, cut)
    with BuildSketch(Plane(origin=(-1.6272220377, -12.6221624709, 5.08), x_dir=(0.1278597252, 0.9917922619, 0), z_dir=(-0.9917922619, 0.1278597252, 0))):
        with BuildLine():
            ThreePointArc((0, -5.08), (5.08, 0), (0, 5.08))
            Line((0, 5.08), (0, -5.08))
        make_face()
    revolve(axis=Axis((-1.6272220377, -12.6221624709, 5.08), (0, 0, -1)), mode=Mode.SUBTRACT)


with BuildPart() as f1_7:
    add(f1_6.part)

    # F2_t55: cut F2_tool56
    add(f2_tool56.part, mode=Mode.SUBTRACT)


with BuildPart() as f2_tool62:
    # F2_s63 → F2_t64 (new body)
    with BuildSketch(Plane.XY.offset(7.92)):
        Polygon((-1.6272220377, -12.6221624709), (-4.1553828443, -17.0283856763), (-2.3302654338, -18.0755841703), (-0.29923138, -17.5255124292), align=None)
    extrude(amount=F2_T64_DEPTH)

    # F2_s65 → F2_t66 (revolve, cut)
    with BuildSketch(Plane(origin=(-1.6272220377, -12.6221624709, 7.92), x_dir=(0.1278597252, 0.9917922619, 0), z_dir=(0.9917922619, -0.1278597252, 0))):
        with BuildLine():
            ThreePointArc((0, -5.08), (5.08, 0), (0, 5.08))
            Line((0, 5.08), (0, -5.08))
        make_face()
    revolve(axis=Axis((-1.6272220377, -12.6221624709, 7.92), (0, 0, 1)), mode=Mode.SUBTRACT)


with BuildPart() as f1_8:
    add(f1_7.part)

    # F2_t61: cut F2_tool62
    add(f2_tool62.part, mode=Mode.SUBTRACT)


with BuildPart() as f2_tool68:
    # F2_s69 → F2_t70 (new body)
    with BuildSketch(Plane.XY.offset(5.08)):
        Polygon((-10.0758364137, -7.7745969391), (-14.979186372, -9.1025875968), (-14.4291146309, -11.1336216505), (-12.6039972204, -12.1808201445), align=None)
    extrude(amount=-F2_T70_DEPTH)

    # F2_s71 → F2_t72 (revolve, cut)
    with BuildSketch(Plane(origin=(-10.0758364137, -7.7745969391, 5.08), x_dir=(0.7917135126, 0.6108925551, 0), z_dir=(-0.6108925551, 0.7917135126, 0))):
        with BuildLine():
            ThreePointArc((0, -5.08), (5.08, 0), (0, 5.08))
            Line((0, 5.08), (0, -5.08))
        make_face()
    revolve(axis=Axis((-10.0758364137, -7.7745969391, 5.08), (0, 0, -1)), mode=Mode.SUBTRACT)


with BuildPart() as f1_9:
    add(f1_8.part)

    # F2_t67: cut F2_tool68
    add(f2_tool68.part, mode=Mode.SUBTRACT)


with BuildPart() as f2_tool74:
    # F2_s75 → F2_t76 (new body)
    with BuildSketch(Plane.XY.offset(7.92)):
        Polygon((-10.0758364137, -7.7745969391), (-14.979186372, -9.1025875968), (-14.4291146309, -11.1336216505), (-12.6039972204, -12.1808201445), align=None)
    extrude(amount=F2_T76_DEPTH)

    # F2_s77 → F2_t78 (revolve, cut)
    with BuildSketch(Plane(origin=(-10.0758364137, -7.7745969391, 7.92), x_dir=(0.7917135126, 0.6108925551, 0), z_dir=(0.6108925551, -0.7917135126, 0))):
        with BuildLine():
            ThreePointArc((0, -5.08), (5.08, 0), (0, 5.08))
            Line((0, 5.08), (0, -5.08))
        make_face()
    revolve(axis=Axis((-10.0758364137, -7.7745969391, 7.92), (0, 0, 1)), mode=Mode.SUBTRACT)


with BuildPart() as f1_10:
    add(f1_9.part)

    # F2_t73: cut F2_tool74
    add(f2_tool74.part, mode=Mode.SUBTRACT)


with BuildPart() as f2_tool80:
    # F2_s81 → F2_t82 (new body)
    with BuildSketch(Plane.XY.offset(5.08)):
        Polygon((-12.6221624709, 1.6272220377), (-17.0283856763, 4.1553828443), (-18.0755841703, 2.3302654338), (-17.5255124292, 0.29923138), align=None)
    extrude(amount=-F2_T82_DEPTH)

    # F2_s83 → F2_t84 (revolve, cut)
    with BuildSketch(Plane(origin=(-12.6221624709, 1.6272220377, 5.08), x_dir=(0.9917922619, -0.1278597252, 0), z_dir=(0.1278597252, 0.9917922619, 0))):
        with BuildLine():
            ThreePointArc((0, -5.08), (5.08, 0), (0, 5.08))
            Line((0, 5.08), (0, -5.08))
        make_face()
    revolve(axis=Axis((-12.6221624709, 1.6272220377, 5.08), (0, 0, -1)), mode=Mode.SUBTRACT)


with BuildPart() as f1_11:
    add(f1_10.part)

    # F2_t79: cut F2_tool80
    add(f2_tool80.part, mode=Mode.SUBTRACT)


with BuildPart() as f2_tool86:
    # F2_s87 → F2_t88 (new body)
    with BuildSketch(Plane.XY.offset(7.92)):
        Polygon((-12.6221624709, 1.6272220377), (-17.0283856763, 4.1553828443), (-18.0755841703, 2.3302654338), (-17.5255124292, 0.29923138), align=None)
    extrude(amount=F2_T88_DEPTH)

    # F2_s89 → F2_t90 (revolve, cut)
    with BuildSketch(Plane(origin=(-12.6221624709, 1.6272220377, 7.92), x_dir=(0.9917922619, -0.1278597252, 0), z_dir=(-0.1278597252, -0.9917922619, 0))):
        with BuildLine():
            ThreePointArc((0, -5.08), (5.08, 0), (0, 5.08))
            Line((0, 5.08), (0, -5.08))
        make_face()
    revolve(axis=Axis((-12.6221624709, 1.6272220377, 7.92), (0, 0, 1)), mode=Mode.SUBTRACT)


with BuildPart() as f1_12:
    add(f1_11.part)

    # F2_t85: cut F2_tool86
    add(f2_tool86.part, mode=Mode.SUBTRACT)

    # F2_s91 → F2_t92 (revolve, cut)
    with BuildSketch(Plane.XZ):
        with BuildLine():
            ThreePointArc((9.5, 5.08), (10.9878975516, 1.4878975516), (14.58, 0))
            Line((14.58, 0), (9.5, 0))
            Line((9.5, 0), (9.5, 5.08))
        make_face()
    revolve(axis=Axis((0, 0, 0), (0, 0, 1)), mode=Mode.SUBTRACT)

    # F2_s93 → F2_t94 (revolve, cut)
    with BuildSketch(Plane.XZ):
        with BuildLine():
            ThreePointArc((9.5, 7.92), (10.9878975516, 11.5121024484), (14.58, 13))
            Line((14.58, 13), (9.5, 13))
            Line((9.5, 13), (9.5, 7.92))
        make_face()
    revolve(axis=Axis((0, 0, 13), (0, 0, 1)), mode=Mode.SUBTRACT)


solid = f1_12.part
